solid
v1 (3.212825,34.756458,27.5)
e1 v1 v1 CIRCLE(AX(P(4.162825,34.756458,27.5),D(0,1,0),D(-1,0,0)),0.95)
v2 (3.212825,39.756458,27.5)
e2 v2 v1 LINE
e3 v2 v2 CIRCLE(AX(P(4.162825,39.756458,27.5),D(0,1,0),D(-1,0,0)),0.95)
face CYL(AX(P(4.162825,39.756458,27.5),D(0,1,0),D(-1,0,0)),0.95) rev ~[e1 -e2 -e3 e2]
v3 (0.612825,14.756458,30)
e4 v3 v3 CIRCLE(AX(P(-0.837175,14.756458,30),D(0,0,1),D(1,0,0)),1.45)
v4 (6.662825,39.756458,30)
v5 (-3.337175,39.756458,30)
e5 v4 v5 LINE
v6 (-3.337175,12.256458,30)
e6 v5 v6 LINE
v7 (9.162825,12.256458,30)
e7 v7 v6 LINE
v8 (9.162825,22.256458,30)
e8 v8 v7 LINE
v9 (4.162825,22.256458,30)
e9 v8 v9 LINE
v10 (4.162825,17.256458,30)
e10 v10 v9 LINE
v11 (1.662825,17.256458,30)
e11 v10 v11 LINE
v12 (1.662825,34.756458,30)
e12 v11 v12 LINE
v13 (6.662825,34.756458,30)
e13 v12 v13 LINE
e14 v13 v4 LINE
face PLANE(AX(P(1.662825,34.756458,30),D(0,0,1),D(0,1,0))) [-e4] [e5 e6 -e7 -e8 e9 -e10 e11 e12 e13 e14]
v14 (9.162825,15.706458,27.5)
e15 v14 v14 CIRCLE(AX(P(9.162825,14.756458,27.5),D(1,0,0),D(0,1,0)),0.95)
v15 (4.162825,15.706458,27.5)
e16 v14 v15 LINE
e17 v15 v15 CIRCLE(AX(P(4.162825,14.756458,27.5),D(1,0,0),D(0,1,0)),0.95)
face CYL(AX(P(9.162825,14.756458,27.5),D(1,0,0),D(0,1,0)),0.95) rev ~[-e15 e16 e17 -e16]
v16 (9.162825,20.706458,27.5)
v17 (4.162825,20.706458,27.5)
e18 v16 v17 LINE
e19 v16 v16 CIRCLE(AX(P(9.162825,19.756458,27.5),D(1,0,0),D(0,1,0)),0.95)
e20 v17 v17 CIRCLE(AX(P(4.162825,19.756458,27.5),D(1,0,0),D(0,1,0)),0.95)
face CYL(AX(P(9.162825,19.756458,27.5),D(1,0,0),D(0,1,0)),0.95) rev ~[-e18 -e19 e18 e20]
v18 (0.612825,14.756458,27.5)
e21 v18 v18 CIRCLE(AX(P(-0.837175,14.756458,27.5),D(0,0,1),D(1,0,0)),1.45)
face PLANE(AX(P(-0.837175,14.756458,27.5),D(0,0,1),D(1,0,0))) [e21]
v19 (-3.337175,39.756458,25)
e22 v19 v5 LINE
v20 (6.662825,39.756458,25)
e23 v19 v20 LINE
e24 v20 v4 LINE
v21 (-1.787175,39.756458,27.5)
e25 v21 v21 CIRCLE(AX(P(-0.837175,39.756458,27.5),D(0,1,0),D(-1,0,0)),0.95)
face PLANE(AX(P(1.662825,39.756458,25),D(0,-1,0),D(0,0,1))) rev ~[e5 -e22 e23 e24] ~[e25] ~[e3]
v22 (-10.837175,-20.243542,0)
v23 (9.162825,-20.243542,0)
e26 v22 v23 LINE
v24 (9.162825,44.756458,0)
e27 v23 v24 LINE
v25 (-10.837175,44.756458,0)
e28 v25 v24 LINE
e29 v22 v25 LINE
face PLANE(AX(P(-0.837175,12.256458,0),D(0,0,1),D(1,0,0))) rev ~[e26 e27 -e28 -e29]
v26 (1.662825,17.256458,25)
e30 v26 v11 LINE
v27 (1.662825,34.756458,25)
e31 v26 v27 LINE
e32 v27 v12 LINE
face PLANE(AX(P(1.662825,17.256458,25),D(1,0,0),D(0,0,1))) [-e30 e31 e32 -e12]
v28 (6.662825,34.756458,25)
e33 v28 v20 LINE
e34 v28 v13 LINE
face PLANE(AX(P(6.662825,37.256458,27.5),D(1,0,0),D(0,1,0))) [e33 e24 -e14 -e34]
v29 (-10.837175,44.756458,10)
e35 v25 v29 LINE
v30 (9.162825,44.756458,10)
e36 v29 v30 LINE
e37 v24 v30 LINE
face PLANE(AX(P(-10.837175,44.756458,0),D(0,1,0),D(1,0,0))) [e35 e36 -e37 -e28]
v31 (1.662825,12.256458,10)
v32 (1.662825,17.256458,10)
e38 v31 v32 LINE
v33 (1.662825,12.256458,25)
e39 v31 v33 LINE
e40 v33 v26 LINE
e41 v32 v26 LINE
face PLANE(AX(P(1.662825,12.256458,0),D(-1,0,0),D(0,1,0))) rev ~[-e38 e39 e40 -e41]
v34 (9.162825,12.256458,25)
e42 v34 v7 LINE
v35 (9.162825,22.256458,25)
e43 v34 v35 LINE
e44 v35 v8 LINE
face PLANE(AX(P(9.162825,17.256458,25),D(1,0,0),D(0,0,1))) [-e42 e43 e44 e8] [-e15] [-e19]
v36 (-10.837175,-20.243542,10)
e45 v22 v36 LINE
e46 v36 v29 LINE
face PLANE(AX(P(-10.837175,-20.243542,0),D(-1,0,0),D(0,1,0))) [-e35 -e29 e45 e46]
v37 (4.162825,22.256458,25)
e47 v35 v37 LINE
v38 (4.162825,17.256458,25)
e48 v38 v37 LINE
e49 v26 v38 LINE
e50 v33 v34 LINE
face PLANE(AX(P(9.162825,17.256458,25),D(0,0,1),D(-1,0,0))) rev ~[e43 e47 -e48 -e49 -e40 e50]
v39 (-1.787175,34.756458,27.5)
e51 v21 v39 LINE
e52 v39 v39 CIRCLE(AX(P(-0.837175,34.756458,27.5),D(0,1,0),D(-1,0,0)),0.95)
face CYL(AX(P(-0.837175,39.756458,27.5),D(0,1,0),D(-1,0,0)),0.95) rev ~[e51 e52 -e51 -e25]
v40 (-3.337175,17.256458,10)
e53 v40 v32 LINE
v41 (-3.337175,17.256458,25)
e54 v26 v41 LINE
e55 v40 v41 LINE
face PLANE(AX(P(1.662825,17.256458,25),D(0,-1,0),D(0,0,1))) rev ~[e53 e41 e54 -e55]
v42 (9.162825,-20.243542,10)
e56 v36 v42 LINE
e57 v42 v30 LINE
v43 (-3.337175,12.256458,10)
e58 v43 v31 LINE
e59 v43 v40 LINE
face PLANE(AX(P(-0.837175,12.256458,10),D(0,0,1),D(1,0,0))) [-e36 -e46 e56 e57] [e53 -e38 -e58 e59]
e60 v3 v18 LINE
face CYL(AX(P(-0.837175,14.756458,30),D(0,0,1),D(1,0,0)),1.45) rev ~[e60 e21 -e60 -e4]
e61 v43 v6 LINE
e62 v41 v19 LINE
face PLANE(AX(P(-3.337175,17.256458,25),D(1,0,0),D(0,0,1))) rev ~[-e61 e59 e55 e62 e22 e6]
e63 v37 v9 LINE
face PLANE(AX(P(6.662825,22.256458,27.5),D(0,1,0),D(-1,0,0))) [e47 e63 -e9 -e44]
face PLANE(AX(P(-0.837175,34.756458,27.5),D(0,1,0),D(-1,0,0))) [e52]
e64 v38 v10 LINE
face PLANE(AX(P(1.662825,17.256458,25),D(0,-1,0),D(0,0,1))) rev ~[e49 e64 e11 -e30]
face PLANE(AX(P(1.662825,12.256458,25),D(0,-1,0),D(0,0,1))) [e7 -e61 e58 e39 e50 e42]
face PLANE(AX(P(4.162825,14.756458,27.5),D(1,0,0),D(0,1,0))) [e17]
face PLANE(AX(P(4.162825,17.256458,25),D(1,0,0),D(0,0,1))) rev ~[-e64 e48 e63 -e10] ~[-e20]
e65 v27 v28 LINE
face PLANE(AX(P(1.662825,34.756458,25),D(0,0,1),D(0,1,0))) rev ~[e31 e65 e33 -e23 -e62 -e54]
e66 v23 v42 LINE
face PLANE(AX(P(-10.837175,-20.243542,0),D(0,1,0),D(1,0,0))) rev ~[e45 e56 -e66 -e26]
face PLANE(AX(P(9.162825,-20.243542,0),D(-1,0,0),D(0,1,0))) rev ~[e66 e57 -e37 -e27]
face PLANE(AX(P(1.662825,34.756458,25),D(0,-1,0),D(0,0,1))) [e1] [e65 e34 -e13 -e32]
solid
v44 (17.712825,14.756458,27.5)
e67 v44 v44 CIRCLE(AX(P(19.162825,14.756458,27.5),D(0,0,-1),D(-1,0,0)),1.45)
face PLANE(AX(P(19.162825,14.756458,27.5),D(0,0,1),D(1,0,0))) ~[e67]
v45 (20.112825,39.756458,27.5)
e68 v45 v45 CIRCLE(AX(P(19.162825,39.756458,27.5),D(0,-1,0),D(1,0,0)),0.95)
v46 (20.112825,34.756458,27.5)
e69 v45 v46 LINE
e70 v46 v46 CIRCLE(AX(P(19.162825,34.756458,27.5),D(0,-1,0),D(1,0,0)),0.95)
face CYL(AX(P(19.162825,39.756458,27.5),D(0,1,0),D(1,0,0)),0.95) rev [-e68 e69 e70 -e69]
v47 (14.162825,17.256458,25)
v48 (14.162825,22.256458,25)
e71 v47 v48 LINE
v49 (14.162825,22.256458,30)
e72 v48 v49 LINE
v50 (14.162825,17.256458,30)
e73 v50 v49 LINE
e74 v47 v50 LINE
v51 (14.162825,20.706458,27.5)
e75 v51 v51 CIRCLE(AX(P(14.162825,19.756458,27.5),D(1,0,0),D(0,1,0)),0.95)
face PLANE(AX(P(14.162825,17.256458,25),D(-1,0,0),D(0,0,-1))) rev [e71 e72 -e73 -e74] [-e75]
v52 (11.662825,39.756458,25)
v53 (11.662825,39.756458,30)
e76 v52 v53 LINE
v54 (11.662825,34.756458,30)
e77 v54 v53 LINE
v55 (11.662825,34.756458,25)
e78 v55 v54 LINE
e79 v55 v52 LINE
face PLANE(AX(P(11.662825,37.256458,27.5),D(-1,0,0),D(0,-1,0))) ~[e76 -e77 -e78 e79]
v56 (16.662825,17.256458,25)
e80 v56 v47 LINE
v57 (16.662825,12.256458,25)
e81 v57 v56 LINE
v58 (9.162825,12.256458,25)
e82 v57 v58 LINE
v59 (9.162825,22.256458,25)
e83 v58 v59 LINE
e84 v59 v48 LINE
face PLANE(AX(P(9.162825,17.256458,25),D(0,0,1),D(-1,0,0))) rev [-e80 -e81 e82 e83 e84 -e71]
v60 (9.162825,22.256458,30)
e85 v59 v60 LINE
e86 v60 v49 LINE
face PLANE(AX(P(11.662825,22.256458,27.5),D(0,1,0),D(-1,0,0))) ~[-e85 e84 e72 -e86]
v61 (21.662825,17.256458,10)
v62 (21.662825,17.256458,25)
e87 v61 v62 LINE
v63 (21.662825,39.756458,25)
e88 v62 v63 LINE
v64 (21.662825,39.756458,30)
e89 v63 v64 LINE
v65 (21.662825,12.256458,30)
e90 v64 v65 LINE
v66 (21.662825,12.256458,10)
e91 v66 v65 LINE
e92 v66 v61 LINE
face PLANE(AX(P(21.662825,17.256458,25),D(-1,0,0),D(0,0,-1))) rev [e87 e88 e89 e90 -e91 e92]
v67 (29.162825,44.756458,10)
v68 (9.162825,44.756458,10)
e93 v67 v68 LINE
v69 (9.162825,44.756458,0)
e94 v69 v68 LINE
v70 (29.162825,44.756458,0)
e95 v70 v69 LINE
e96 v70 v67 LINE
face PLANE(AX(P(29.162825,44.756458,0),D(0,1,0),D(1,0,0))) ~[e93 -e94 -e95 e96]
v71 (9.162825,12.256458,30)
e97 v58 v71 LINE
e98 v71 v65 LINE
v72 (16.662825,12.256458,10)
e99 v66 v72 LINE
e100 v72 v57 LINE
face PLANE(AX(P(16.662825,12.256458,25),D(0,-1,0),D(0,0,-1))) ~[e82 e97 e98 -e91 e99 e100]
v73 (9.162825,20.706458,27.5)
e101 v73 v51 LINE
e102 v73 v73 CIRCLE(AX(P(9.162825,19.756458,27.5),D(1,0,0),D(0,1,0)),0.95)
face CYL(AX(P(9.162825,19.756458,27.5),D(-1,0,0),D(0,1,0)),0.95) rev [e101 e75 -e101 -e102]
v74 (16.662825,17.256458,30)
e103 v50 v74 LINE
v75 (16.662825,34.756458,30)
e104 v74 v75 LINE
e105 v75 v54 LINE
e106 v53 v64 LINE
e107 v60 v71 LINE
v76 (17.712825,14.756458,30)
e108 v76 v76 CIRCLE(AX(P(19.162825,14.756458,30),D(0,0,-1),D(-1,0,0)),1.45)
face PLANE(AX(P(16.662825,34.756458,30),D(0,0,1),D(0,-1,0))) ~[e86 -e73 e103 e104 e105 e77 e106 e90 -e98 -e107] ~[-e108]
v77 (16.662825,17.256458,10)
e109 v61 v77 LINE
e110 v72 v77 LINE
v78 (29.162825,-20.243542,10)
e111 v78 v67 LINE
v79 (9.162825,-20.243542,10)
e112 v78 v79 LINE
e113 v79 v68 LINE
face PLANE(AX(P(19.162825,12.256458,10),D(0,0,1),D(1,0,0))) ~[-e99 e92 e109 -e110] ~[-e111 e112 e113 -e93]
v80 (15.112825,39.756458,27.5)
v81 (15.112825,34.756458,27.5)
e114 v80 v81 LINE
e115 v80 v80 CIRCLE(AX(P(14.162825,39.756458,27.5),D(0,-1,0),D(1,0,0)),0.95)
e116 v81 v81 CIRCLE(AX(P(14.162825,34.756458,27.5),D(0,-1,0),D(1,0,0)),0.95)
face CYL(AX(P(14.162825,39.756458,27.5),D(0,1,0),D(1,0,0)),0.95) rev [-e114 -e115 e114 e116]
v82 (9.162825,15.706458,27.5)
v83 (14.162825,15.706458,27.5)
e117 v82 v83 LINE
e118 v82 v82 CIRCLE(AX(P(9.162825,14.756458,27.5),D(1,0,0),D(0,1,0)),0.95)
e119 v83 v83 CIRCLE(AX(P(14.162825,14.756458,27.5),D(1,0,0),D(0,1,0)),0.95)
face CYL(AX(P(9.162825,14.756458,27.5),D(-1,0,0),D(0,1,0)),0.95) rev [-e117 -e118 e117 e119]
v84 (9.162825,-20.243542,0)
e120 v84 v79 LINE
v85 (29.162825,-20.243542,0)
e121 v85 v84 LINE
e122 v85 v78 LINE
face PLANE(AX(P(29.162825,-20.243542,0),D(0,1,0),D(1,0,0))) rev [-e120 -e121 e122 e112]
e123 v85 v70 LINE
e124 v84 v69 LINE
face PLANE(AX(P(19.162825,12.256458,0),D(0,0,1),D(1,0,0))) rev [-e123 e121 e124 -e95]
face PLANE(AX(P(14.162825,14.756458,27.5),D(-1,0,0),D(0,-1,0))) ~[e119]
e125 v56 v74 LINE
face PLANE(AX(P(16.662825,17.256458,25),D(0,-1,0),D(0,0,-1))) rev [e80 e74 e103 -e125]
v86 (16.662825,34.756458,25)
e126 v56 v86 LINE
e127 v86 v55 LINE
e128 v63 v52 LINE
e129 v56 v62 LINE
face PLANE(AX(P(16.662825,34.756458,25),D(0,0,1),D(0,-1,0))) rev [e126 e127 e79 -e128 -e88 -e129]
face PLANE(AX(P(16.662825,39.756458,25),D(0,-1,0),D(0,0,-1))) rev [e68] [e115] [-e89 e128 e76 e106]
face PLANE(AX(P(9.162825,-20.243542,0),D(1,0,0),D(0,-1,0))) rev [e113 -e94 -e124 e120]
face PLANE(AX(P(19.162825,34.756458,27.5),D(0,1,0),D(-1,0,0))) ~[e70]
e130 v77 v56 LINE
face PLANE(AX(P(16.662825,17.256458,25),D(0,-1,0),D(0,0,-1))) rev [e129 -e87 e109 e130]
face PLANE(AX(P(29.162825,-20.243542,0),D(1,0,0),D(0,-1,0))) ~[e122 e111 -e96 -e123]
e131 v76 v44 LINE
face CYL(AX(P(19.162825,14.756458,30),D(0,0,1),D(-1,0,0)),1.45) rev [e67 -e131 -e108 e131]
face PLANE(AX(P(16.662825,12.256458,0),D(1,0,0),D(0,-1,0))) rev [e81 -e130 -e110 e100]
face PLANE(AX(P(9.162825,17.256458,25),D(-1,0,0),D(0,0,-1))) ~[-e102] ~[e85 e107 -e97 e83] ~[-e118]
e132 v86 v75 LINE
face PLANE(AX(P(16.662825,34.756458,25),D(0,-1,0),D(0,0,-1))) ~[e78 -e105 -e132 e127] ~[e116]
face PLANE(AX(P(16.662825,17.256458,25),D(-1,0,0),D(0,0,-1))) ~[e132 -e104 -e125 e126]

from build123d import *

# Parameters (mm, degrees)
F0_W      = 20
F0_H      = 65
F0_W_2    = 5
F0_H_2    = 5
F1_DEPTH  = 10
F2_DEPTH  = 30
F3_W      = 5
F3_H      = 5
F4_DEPTH  = 7.5
F5_W      = 5
F5_H      = 5
F6_DEPTH  = 22.5
F7_R      = 1.45
F8_DEPTH  = 2.5
F9_R      = 0.95
F10_DEPTH = 5
F11_R     = 0.95
F12_DEPTH = 5
F13_W     = 5
F13_H     = 5
F14_DEPTH = 5
F15_W     = 5
F15_H     = 5
F16_DEPTH = 5
F18_R     = 0.95
F19_DEPTH = 5
F20_R     = 0.95
F21_DEPTH = 5


with BuildPart() as f1:
    # F0 (on Top) → F1 (new body)
    with BuildSketch(Plane.XY):
        with Locations((-0.8371751755, 12.2564576566)):
            Rectangle(F0_W, F0_H)
        with Locations((-0.8371751755, 14.7564576566)):
            Rectangle(F0_W_2, F0_H_2, mode=Mode.SUBTRACT)
    extrude(amount=F1_DEPTH)

    # F0 (on Top) → F2 (join)
    with BuildSketch(Plane.XY):
        with Locations((-0.8371751755, 14.7564576566)):
            Rectangle(F0_W_2, F0_H_2)
    extrude(amount=F2_DEPTH)

    # F3 (on face) → F4 (join)
    with BuildSketch(Plane.YZ.offset(1.6628248245)):
        with Locations((14.7564576566, 27.5)):
            Rectangle(F3_W, F3_H)
    extrude(amount=F4_DEPTH)

    # F5 (on face) → F6 (join)
    with BuildSketch(Plane(origin=(0, 17.2564576566, 0), x_dir=(-1, 0, 0), z_dir=(0, 1, 0))):
        with Locations((0.8371751755, 27.5)):
            Rectangle(F5_W, F5_H)
    extrude(amount=F6_DEPTH)

    # F7 (on face) → F8 (cut)
    with BuildSketch(Plane.XY.offset(30)):
        with Locations((-0.8371751755, 14.7564576566)):
            Circle(F7_R)
    extrude(amount=-F8_DEPTH, mode=Mode.SUBTRACT)

    # F9 (on face) → F10 (cut)
    with BuildSketch(Plane(origin=(0, 39.7564576566, 0), x_dir=(-1, 0, 0), z_dir=(0, 1, 0))):
        with Locations((0.8371751755, 27.5)):
            Circle(F9_R)
    extrude(amount=-F10_DEPTH, mode=Mode.SUBTRACT)

    # F11 (on face) → F12 (cut)
    with BuildSketch(Plane.YZ.offset(9.1628248245)):
        with Locations((14.7564576566, 27.5)):
            Circle(F11_R)
    extrude(amount=-F12_DEPTH, mode=Mode.SUBTRACT)

    # F13 (on face) → F14 (join)
    with BuildSketch(Plane(origin=(0, 17.2564576566, 0), x_dir=(-1, 0, 0), z_dir=(0, 1, 0))):
        with Locations((-6.6628248245, 27.5)):
            Rectangle(F13_W, F13_H)
    extrude(amount=F14_DEPTH)

    # F15 (on face) → F16 (join)
    with BuildSketch(Plane.YZ.offset(1.6628248245)):
        with Locations((37.2564576566, 27.5)):
            Rectangle(F15_W, F15_H)
    extrude(amount=F16_DEPTH)

    # F17: union 

    # F18 (on face) → F19 (cut)
    with BuildSketch(Plane(origin=(0, 39.7564576566, 0), x_dir=(-1, 0, 0), z_dir=(0, 1, 0))):
        with Locations((-4.1628248245, 27.5)):
            Circle(F18_R)
    extrude(amount=-F19_DEPTH, mode=Mode.SUBTRACT)

    # F20 (on face) → F21 (cut)
    with BuildSketch(Plane.YZ.offset(9.1628248245)):
        with Locations((19.7564576566, 27.5)):
            Circle(F20_R)
    extrude(amount=-F21_DEPTH, mode=Mode.SUBTRACT)


with BuildPart() as f22_1:
    # F22: instance of F1
    add(f1.part.mirror(Plane(origin=(9.1628248245, 12.2564576566, 5), x_dir=(0, 1, 0), z_dir=(1, 0, 0))))


solid = Compound([f1.part, f22_1.part])
